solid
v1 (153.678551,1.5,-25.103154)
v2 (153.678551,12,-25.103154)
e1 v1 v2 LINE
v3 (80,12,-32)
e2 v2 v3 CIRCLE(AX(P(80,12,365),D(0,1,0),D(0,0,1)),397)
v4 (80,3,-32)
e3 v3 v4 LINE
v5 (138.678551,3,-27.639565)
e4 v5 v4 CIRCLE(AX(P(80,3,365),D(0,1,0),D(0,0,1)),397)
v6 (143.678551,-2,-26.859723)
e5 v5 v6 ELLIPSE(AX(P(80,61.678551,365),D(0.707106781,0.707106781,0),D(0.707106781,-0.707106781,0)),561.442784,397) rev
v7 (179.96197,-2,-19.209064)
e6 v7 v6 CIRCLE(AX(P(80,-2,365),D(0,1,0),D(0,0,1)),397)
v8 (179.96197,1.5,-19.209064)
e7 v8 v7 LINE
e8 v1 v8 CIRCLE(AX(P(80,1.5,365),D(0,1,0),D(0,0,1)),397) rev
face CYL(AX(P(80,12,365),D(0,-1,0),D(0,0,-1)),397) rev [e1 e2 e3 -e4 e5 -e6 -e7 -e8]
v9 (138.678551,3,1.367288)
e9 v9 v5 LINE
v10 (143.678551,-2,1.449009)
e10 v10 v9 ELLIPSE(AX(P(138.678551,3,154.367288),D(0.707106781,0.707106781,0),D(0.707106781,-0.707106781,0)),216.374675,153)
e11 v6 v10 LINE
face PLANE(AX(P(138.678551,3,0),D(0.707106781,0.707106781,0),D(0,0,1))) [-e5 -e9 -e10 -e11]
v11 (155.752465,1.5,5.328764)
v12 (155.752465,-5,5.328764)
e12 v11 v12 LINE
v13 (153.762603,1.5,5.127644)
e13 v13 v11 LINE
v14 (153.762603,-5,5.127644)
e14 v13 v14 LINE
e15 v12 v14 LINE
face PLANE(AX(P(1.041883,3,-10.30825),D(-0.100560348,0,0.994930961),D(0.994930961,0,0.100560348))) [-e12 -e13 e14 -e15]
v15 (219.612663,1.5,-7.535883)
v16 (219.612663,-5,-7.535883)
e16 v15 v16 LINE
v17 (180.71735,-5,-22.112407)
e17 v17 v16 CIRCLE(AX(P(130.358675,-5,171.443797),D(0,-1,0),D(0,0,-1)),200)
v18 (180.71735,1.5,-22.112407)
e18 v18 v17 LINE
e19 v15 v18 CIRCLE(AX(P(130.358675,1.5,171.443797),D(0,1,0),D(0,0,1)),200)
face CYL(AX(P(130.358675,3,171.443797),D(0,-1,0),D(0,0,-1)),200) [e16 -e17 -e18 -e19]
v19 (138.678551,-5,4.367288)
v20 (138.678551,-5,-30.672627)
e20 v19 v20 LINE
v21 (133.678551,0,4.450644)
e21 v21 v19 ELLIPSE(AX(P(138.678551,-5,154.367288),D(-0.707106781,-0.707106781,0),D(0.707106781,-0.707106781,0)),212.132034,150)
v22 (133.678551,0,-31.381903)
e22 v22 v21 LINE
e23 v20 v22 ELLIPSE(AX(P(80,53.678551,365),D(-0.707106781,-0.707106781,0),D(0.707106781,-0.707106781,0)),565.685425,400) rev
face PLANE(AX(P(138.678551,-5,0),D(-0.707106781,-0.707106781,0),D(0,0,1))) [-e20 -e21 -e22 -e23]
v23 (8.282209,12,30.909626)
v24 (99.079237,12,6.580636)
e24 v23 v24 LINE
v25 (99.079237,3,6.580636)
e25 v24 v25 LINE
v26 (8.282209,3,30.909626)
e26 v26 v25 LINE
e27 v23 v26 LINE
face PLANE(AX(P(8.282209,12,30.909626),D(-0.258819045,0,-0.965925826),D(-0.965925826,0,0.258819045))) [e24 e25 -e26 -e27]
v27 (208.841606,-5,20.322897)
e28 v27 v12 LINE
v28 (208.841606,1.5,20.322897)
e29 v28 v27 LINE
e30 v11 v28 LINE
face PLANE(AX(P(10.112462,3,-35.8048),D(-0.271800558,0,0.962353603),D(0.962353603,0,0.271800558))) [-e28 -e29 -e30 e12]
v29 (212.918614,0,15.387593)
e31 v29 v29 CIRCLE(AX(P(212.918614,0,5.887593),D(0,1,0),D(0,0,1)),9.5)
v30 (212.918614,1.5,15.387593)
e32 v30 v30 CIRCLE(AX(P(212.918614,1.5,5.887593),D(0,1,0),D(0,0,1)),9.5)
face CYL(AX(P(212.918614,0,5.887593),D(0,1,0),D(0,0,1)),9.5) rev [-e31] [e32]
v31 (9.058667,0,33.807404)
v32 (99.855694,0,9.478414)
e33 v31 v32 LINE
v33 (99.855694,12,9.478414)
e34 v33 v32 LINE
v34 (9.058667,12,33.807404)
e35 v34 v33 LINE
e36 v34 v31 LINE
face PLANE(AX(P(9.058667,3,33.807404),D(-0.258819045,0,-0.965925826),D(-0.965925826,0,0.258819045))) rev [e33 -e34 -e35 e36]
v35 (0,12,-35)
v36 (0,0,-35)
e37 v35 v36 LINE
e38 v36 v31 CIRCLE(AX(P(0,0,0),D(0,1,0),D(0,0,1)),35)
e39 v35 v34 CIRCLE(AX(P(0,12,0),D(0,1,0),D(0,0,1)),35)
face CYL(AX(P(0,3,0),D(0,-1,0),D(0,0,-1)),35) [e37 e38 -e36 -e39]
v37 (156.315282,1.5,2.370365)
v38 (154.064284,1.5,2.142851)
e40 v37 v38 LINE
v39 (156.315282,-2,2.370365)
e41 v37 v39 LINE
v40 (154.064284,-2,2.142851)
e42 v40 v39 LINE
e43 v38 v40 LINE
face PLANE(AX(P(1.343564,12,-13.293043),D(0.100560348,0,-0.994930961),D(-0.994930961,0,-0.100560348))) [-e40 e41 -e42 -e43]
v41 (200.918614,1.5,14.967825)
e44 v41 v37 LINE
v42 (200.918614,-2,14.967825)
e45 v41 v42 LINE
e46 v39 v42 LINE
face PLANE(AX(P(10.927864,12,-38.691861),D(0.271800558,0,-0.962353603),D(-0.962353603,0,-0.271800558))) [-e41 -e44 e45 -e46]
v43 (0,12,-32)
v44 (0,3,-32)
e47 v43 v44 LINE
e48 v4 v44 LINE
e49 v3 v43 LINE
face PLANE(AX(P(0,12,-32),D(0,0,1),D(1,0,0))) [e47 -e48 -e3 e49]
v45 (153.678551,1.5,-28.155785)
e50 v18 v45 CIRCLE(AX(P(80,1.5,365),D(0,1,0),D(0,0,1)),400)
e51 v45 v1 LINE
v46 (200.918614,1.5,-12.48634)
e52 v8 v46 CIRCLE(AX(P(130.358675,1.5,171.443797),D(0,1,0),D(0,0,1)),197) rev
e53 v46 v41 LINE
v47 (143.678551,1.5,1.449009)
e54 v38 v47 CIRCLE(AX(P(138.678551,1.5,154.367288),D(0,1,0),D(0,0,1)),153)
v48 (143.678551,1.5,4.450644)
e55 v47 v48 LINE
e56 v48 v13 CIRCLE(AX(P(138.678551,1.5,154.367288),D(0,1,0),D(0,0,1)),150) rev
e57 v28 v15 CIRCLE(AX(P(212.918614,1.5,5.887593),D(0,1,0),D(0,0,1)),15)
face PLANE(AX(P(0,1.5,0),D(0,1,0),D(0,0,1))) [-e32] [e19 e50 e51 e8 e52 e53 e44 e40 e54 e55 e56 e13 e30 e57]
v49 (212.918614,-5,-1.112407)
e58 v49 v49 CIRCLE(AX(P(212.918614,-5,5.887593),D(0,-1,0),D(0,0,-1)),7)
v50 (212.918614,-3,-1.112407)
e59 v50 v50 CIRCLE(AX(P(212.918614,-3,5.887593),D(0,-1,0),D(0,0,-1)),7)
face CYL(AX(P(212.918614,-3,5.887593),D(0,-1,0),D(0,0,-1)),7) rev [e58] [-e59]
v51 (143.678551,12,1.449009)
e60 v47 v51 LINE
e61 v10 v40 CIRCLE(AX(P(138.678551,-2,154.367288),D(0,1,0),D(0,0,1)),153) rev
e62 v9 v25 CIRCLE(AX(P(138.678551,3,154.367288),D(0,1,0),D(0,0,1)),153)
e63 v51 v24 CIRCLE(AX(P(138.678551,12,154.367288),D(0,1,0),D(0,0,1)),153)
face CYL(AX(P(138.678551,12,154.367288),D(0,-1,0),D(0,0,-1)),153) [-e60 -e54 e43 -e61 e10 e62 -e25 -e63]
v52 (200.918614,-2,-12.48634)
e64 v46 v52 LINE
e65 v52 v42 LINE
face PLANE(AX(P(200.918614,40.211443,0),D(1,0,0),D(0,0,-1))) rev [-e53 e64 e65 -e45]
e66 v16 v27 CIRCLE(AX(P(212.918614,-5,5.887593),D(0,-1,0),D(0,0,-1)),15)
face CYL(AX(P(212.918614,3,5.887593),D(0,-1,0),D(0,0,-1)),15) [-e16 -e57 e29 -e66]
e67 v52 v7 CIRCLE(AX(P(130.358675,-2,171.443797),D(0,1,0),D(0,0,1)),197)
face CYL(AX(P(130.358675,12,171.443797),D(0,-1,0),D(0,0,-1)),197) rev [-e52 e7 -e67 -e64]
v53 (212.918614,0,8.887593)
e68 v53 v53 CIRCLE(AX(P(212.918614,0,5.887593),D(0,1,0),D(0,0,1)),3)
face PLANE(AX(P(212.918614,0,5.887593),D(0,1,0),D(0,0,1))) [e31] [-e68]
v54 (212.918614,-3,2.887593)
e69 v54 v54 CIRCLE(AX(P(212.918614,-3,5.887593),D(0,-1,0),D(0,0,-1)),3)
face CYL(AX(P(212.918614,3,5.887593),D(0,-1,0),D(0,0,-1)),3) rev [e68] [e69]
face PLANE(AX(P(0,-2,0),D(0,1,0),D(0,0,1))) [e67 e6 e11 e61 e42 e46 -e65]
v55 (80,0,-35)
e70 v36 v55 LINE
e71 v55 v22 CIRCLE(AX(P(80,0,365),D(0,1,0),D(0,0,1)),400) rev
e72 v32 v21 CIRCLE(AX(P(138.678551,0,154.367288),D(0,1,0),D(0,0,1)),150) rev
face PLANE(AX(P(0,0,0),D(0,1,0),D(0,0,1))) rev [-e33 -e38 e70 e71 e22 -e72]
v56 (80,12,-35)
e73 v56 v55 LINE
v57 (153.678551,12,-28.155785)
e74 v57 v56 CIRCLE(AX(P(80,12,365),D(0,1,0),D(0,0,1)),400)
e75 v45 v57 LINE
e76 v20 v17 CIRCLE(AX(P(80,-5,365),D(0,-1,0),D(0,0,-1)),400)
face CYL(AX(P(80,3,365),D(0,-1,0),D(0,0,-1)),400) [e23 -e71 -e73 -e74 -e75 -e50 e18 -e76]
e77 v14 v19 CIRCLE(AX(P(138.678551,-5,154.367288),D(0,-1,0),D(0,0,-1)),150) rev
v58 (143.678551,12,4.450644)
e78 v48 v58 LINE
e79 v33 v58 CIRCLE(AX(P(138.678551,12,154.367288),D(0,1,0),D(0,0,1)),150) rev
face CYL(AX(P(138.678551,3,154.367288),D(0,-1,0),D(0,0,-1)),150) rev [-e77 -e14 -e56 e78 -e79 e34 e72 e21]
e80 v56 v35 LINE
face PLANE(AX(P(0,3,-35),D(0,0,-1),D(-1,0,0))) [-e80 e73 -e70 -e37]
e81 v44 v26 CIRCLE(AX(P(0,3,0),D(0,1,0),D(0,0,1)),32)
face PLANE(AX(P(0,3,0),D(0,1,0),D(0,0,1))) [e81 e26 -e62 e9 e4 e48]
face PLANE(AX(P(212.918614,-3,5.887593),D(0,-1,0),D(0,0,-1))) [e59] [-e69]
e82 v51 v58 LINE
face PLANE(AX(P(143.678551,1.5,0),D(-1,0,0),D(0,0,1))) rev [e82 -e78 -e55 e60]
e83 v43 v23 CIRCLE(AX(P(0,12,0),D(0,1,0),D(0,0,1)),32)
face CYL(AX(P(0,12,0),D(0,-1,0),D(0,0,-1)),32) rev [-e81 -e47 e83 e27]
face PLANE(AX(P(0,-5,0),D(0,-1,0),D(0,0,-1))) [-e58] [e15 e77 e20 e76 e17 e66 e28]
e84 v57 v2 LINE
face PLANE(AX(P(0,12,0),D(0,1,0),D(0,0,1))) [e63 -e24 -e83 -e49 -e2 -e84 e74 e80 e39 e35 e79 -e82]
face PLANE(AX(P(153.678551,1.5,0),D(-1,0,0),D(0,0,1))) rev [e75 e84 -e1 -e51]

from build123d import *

# Parameters (mm, degrees)
SKETCH_1_R          = 35.00000000000001
SKETCH_1_R_2        = 14.999999999998519
SKETCH_1_R_3        = 2.999999999998513
EXTRUDE_1_DEPTH     = 3
EXTRUDE_2_DEPTH     = 9
EXTRUDE_START       = 5
SKETCH_3_R          = 2.999999999998504
EXTRUDE_3_DEPTH     = 5
CHAMFER_2_SIZE      = 5
CUT_EXTRUDE_START   = -5
SKETCH_5_R          = 2.9999999999987814
CUT_EXTRUDE_1_DEPTH = 5
CHAMFER_3_SIZE      = 5
CUT_EXTRUDE_START_2 = -10.5
CUT_EXTRUDE_2_DEPTH = 10.5
SKETCH_7_R          = 2.9999999999981983
EXTRUDE_5_DEPTH     = 3.5
CUT_EXTRUDE_START_3 = -1.5
SKETCH_8_R          = 9.499999999999694
SKETCH_8_R_2        = 2.9999999999981988
CUT_EXTRUDE_3_DEPTH = 1.5
SKETCH_9_R          = 7.000000000000014
CUT_EXTRUDE_4_DEPTH = 2


with BuildPart() as part:
    # 草图1 → 凸台-拉伸1 (new body)
    # profile 1 of 3: a face of its own
    with BuildSketch(Plane(origin=(0, 0, 0), x_dir=(1, 0, 0), z_dir=(0, 1, 0))):
        Circle(SKETCH_1_R)
    # profile 2 of 3: a face of its own
    with BuildSketch(Plane(origin=(0, 0, 0), x_dir=(1, 0, 0), z_dir=(0, 1, 0))):
        with BuildLine():
            Line((80, 35.00000000000001), (0, 35.00000000000001))
            ThreePointArc((2.14e-15, 35.00000000000001), (24.74873734152917, 24.748737341529168), (35.00000000000001, 0))
            ThreePointArc((35.00000000000001, -8.57e-15), (27.76736691019325, -21.306650015305213), (9.058666578588273, -33.80740392011739))
            Line((9.058666578588266, -33.80740392011739), (99.85569424976063, -9.478413680480333))
            ThreePointArc((99.85569424976065, -9.478413680480344), (126.61144649660456, -4.8534588703142845), (153.76260315826568, -5.127643524347377))
            Line((153.76260315826565, -5.127643524347345), (155.75246507959224, -5.328764219589036))
            Line((155.75246507959224, -5.328764219589036), (208.84160576054387, -20.322897386273407))
            ThreePointArc((208.84160576054387, -20.322897386273397), (198.92789824314943, -0.47835413257180903), (219.61266324779353, 7.5358825990905824))
            ThreePointArc((219.61266324779353, 7.53588259909057), (200.54444782077312, 15.836627562355744), (180.7173501180477, 22.11240665367282))
            ThreePointArc((180.71735011804773, 22.112406653672906), (130.7692689455484, 31.765020296314162), (80, 35.00000000000006))
        make_face()
    # profile 3 of 3: a face of its own
    with BuildSketch(Plane(origin=(0, 0, 0), x_dir=(1, 0, 0), z_dir=(0, 1, 0))):
        with Locations((212.91861413363648, -5.887593346327154)):
            Circle(SKETCH_1_R_2)
        with Locations(Location((212.91861413363648, -5.887593346327154, 0), (0, 0, 270))):
            Circle(SKETCH_1_R_3, mode=Mode.SUBTRACT)
    extrude(amount=EXTRUDE_1_DEPTH)

    # 草图2 → 凸台-拉伸2 (add)
    with BuildSketch(Plane(origin=(0, 3, 0), x_dir=(1, 0, 0), z_dir=(0, 1, 0))):
        with BuildLine():
            ThreePointArc((2.14e-15, 35), (-34.70057014808337, -4.5684167277018295), (9.058666578588264, -33.807403920117395))
            Line((9.058666578588271, -33.80740392011739), (99.85569424976065, -9.478413680480333))
            ThreePointArc((99.85569424976063, -9.478413680480287), (126.61144649660456, -4.853458870314313), (153.76260315826565, -5.127643524347235))
            Line((153.76260315826565, -5.127643524347247), (155.75246507959224, -5.328764219589035))
            Line((155.75246507959224, -5.328764219589035), (208.84160576054387, -20.3228973862734))
            ThreePointArc((208.84160576054387, -20.322897386273414), (226.9093300241235, -11.296832560082503), (219.61266324779353, 7.535882599090587))
            ThreePointArc((219.61266324779353, 7.535882599090655), (200.54444782077314, 15.83662756235583), (180.71735011804776, 22.112406653672934))
            ThreePointArc((180.71735011804773, 22.112406653672906), (130.76926894554842, 31.765020296314162), (80.00000000000003, 35))
            Line((80.00000000000003, 35.00000000000003), (0, 35))
        make_face()
        with BuildLine():
            Line((99.0792371144531, -6.580636201613121), (8.282209443280715, -30.909626441250172))
            ThreePointArc((8.282209443280705, -30.909626441250175), (-31.726235563961932, -4.176838151041671), (1.96e-15, 32))
            Line((0, 32), (80.00000000000007, 32.00000000000003))
            ThreePointArc((80.00000000000009, 31.999999999999943), (130.3884994284568, 28.789282644091656), (179.96196999216235, 19.20906360377029))
            ThreePointArc((179.96196999216238, 19.209063603770403), (199.49166122934687, 13.027421198822964), (218.273853424962, 4.851187410006787))
            ThreePointArc((218.27385342496197, 4.851187410006782), (224.11118684602587, -10.214984717331333), (209.65700743516246, -17.43583657828386))
            Line((209.65700743516246, -17.435836578283872), (156.31528166260176, -2.370365008850316))
            Line((156.31528166260176, -2.370365008850316), (154.06428420112817, -2.1428506423573914))
            ThreePointArc((154.06428420112817, -2.142850642357388), (126.37010440623386, -1.8631822952438597), (99.0792371144531, -6.5806362016131175))
        make_face(mode=Mode.SUBTRACT)
    extrude(amount=EXTRUDE_2_DEPTH)

    # 草图3 → 凸台-拉伸3 (add)
    # profile 1 of 2: a face of its own
    with BuildSketch(Plane.XZ.offset(EXTRUDE_START)):
        with BuildLine():
            ThreePointArc((219.61266324779353, -7.535882599090586), (198.92789824314943, 0.47835413257181436), (208.84160576054387, 20.322897386273397))
            Line((208.84160576054387, 20.322897386273407), (155.75246507959224, 5.328764219589036))
            Line((155.75246507959224, 5.328764219589036), (153.76260315826562, 5.127643524347275))
            ThreePointArc((153.76260315826562, 5.127643524347263), (146.23015300001683, 4.557497197907537), (138.6785510151405, 4.36728762384061))
            Line((138.6785510151405, 4.36728762384056), (138.67855101513894, -30.67262686564981))
            ThreePointArc((138.6785510151389, -30.672626865649704), (159.81279763944207, -26.9565247995821), (180.71735011804768, -22.112406653672792))
            ThreePointArc((180.7173501180477, -22.112406653672878), (200.54444782077314, -15.836627562355801), (219.6126632477936, -7.535882599090598))
        make_face()
    # profile 2 of 2: a face of its own
    with BuildSketch(Plane.XZ.offset(EXTRUDE_START)):
        with BuildLine():
            ThreePointArc((227.918614133635, 5.887593346327154), (221.96971556947213, 17.84909671330278), (208.84160576054387, 20.322897386273397))
            ThreePointArc((208.84160576054387, 20.322897386273397), (198.92789824314943, 0.47835413257181436), (219.61266324779353, -7.535882599090586))
            ThreePointArc((219.61266324779353, -7.535882599090586), (225.6742155838289, -2.0051014814110157), (227.918614133635, 5.887593346327151))
        make_face()
        with Locations(Location((212.91861413363648, 5.887593346327154, 0), (0, 0, 270))):
            Circle(SKETCH_3_R, mode=Mode.SUBTRACT)
    extrude(amount=-EXTRUDE_3_DEPTH)

    # 倒角2
    chamfer_2_edges = [part.edges().sort_by_distance(p)[0] for p in [
        (138.6785510151397, 0, -13.152669620904625),
    ]]
    chamfer(chamfer_2_edges, length=CHAMFER_2_SIZE - 0.0001)  # a hair under: the kernel refuses the full size

    # 草图5 → 切除-拉伸1 (cut)
    # profile 1 of 2: a face of its own
    with BuildSketch(Plane(origin=(0, 3, 0), x_dir=(1, 0, 0), z_dir=(0, 1, 0)).offset(CUT_EXTRUDE_START)):
        with BuildLine():
            ThreePointArc((179.96196999216247, 19.209063603770403), (159.43218530873725, 23.972399968273407), (138.6785510151319, 27.639564550956322))
            Line((138.67855101513908, 27.639564550957424), (138.67855101514036, -1.3672876238405252))
            ThreePointArc((138.67855101514482, -1.3672876238405536), (146.38118503971654, -1.561301389388916), (154.06428420112817, -2.142850642357331))
            Line((154.06428420112817, -2.1428506423573634), (156.31528166260176, -2.370365008850312))
            Line((156.31528166260176, -2.370365008850312), (200.99582501119374, -14.989631554428025))
            ThreePointArc((200.9958250111938, -14.989631554427945), (198.86414193463486, -0.6462374904961061), (209.86727048552746, 8.798771143944375))
            ThreePointArc((209.8672704855274, 8.798771143943867), (195.1241257664407, 14.605756926583496), (179.96196999216244, 19.209063603770346))
        make_face()
    # profile 2 of 2: a face of its own
    with BuildSketch(Plane(origin=(0, 3, 0), x_dir=(1, 0, 0), z_dir=(0, 1, 0)).offset(CUT_EXTRUDE_START)):
        with BuildLine():
            ThreePointArc((218.273853424962, 4.851187410006787), (214.09382814337536, 6.874525823264776), (209.8672704855274, 8.798771143943867))
            ThreePointArc((209.86727048552746, 8.798771143944375), (198.86414193463486, -0.6462374904961061), (200.9958250111938, -14.989631554427945))
            Line((200.99582501119374, -14.989631554428025), (209.65700743516246, -17.435836578283855))
            ThreePointArc((209.65700743516246, -17.435836578283855), (224.11118684602584, -10.214984717331326), (218.27385342496197, 4.851187410006769))
        make_face()
        with Locations(Location((212.91861413363648, -5.887593346327154, 0), (0, 0, 90))):
            Circle(SKETCH_5_R, mode=Mode.SUBTRACT)
    extrude(amount=CUT_EXTRUDE_1_DEPTH, mode=Mode.SUBTRACT)

    # 倒角3
    chamfer_3_edges = [part.edges().sort_by_distance(p)[0] for p in [
        (138.6785510151397, -2, -13.13613846355845),
    ]]
    chamfer(chamfer_3_edges, length=CHAMFER_3_SIZE - 0.0001)  # a hair under: the kernel refuses the full size

    # 草图6 → 切除-拉伸2 (cut)
    with BuildSketch(Plane(origin=(0, 12, 0), x_dir=(1, 0, 0), z_dir=(0, 1, 0)).offset(CUT_EXTRUDE_START_2)):
        with BuildLine():
            ThreePointArc((180.71735011804762, 22.112406653672963), (167.25029047437937, 25.368270754855814), (153.67855101513908, 28.155784798226705))
            Line((153.67855101513908, 28.155784798226733), (153.67855101513908, 25.103154460854327))
            ThreePointArc((153.6785510151392, 25.103154460854853), (166.8702636733634, 22.37908731541046), (179.96196999216247, 19.209063603770403))
            ThreePointArc((179.96196999216244, 19.209063603770375), (199.4916612293469, 13.027421198822992), (218.273853424962, 4.8511874100068155))
            ThreePointArc((218.27385342496197, 4.851187410006791), (224.11118684602587, -10.214984717331326), (209.65700743516246, -17.435836578283855))
            Line((209.65700743516246, -17.43583657828387), (156.31528166260176, -2.370365008850314))
            Line((156.31528166260176, -2.370365008850314), (154.06428420112817, -2.1428506423573634))
            ThreePointArc((154.06428420112817, -2.1428506423573594), (148.87731974032897, -1.707583980442621), (143.67855101514033, -1.4490087949183987))
            Line((143.67855101514033, -1.4490087949183827), (143.67855101514033, -4.450644118191127))
            ThreePointArc((143.67855101514033, -4.450644118191121), (148.72628059305634, -4.704188864229678), (153.76260315826565, -5.127643524347263))
            Line((153.76260315826565, -5.127643524347275), (155.7524650795923, -5.328764219589041))
            Line((155.7524650795923, -5.328764219589041), (208.84160576054387, -20.322897386273397))
            ThreePointArc((208.84160576054387, -20.32289738627341), (226.90933002412353, -11.296832560082489), (219.6126632477935, 7.535882599090598))
            ThreePointArc((219.61266324779353, 7.535882599090627), (200.54444782077303, 15.836627562355801), (180.7173501180476, 22.112406653672906))
        make_face()
    extrude(amount=CUT_EXTRUDE_2_DEPTH, mode=Mode.SUBTRACT)

    # 草图7 → 凸台-拉伸5 (add)
    # profile 1 of 3: a face of its own
    with BuildSketch(Plane(origin=(0, -2, 0), x_dir=(1, 0, 0), z_dir=(0, 1, 0))):
        with BuildLine():
            ThreePointArc((218.273853424962, 4.8511874100068155), (209.68814372522309, 8.87768125206452), (200.91861413363713, 12.48633951388669))
            Line((200.91861413363716, 12.486339513886715), (200.91861413363796, -5.887593233665726))
            ThreePointArc((200.91861413363787, -5.88759323366572), (206.60445831934817, 4.31688784346667), (218.273853424962, 4.851187410006878))
        make_face()
    # profile 2 of 3: a face of its own
    with BuildSketch(Plane(origin=(0, -2, 0), x_dir=(1, 0, 0), z_dir=(0, 1, 0))):
        with BuildLine():
            ThreePointArc((218.273853424962, 4.851187410006878), (206.60445831934817, 4.31688784346667), (200.91861413363787, -5.88759323366572))
            ThreePointArc((200.91861413363787, -5.887593233665726), (203.3494114060658, -13.128474450075544), (209.65700743516243, -17.43583657828395))
            ThreePointArc((209.65700743516243, -17.43583657828395), (220.15949528230487, -15.456796039907507), (224.9186141336351, -5.887593346327157))
            ThreePointArc((224.9186141336351, -5.887593346327154), (223.12309529379024, 0.4265625158632913), (218.273853424962, 4.851187410006878))
        make_face()
        with Locations(Location((212.91861413363648, -5.887593346327154, 0), (0, 0, 90))):
            Circle(SKETCH_7_R, mode=Mode.SUBTRACT)
    # profile 3 of 3: a face of its own
    with BuildSketch(Plane(origin=(0, -2, 0), x_dir=(1, 0, 0), z_dir=(0, 1, 0))):
        with BuildLine():
            ThreePointArc((209.65700743516243, -17.43583657828395), (203.3494114060658, -13.128474450075544), (200.91861413363787, -5.887593233665726))
            Line((200.91861413363796, -5.887593233665726), (200.91861413363836, -14.9678246431627))
            Line((200.91861413363836, -14.967824643162707), (209.65700743516246, -17.43583657828387))
        make_face()
    extrude(amount=EXTRUDE_5_DEPTH)

    # 草图8 → 切除-拉伸3 (cut)
    with BuildSketch(Plane(origin=(0, 1.4999999999999996, 0), x_dir=(1, 0, 0), z_dir=(0, 1, 0)).offset(CUT_EXTRUDE_START_3)):
        with Locations(Location((212.91861413363648, -5.887593346327154, 0), (0, 0, 270))):
            Circle(SKETCH_8_R)
        with Locations(Location((212.91861413363648, -5.887593346327154, 0), (0, 0, 90))):
            Circle(SKETCH_8_R_2, mode=Mode.SUBTRACT)
    extrude(amount=CUT_EXTRUDE_3_DEPTH, mode=Mode.SUBTRACT)

    # 草图9 → 切除-拉伸4 (cut)
    with BuildSketch(Plane.XZ.offset(5)):
        with Locations(Location((212.91861413363645, 5.887593346328139, 0), (0, 0, 270))):
            Circle(SKETCH_9_R)
    extrude(amount=-CUT_EXTRUDE_4_DEPTH, mode=Mode.SUBTRACT)


solid = part.part
